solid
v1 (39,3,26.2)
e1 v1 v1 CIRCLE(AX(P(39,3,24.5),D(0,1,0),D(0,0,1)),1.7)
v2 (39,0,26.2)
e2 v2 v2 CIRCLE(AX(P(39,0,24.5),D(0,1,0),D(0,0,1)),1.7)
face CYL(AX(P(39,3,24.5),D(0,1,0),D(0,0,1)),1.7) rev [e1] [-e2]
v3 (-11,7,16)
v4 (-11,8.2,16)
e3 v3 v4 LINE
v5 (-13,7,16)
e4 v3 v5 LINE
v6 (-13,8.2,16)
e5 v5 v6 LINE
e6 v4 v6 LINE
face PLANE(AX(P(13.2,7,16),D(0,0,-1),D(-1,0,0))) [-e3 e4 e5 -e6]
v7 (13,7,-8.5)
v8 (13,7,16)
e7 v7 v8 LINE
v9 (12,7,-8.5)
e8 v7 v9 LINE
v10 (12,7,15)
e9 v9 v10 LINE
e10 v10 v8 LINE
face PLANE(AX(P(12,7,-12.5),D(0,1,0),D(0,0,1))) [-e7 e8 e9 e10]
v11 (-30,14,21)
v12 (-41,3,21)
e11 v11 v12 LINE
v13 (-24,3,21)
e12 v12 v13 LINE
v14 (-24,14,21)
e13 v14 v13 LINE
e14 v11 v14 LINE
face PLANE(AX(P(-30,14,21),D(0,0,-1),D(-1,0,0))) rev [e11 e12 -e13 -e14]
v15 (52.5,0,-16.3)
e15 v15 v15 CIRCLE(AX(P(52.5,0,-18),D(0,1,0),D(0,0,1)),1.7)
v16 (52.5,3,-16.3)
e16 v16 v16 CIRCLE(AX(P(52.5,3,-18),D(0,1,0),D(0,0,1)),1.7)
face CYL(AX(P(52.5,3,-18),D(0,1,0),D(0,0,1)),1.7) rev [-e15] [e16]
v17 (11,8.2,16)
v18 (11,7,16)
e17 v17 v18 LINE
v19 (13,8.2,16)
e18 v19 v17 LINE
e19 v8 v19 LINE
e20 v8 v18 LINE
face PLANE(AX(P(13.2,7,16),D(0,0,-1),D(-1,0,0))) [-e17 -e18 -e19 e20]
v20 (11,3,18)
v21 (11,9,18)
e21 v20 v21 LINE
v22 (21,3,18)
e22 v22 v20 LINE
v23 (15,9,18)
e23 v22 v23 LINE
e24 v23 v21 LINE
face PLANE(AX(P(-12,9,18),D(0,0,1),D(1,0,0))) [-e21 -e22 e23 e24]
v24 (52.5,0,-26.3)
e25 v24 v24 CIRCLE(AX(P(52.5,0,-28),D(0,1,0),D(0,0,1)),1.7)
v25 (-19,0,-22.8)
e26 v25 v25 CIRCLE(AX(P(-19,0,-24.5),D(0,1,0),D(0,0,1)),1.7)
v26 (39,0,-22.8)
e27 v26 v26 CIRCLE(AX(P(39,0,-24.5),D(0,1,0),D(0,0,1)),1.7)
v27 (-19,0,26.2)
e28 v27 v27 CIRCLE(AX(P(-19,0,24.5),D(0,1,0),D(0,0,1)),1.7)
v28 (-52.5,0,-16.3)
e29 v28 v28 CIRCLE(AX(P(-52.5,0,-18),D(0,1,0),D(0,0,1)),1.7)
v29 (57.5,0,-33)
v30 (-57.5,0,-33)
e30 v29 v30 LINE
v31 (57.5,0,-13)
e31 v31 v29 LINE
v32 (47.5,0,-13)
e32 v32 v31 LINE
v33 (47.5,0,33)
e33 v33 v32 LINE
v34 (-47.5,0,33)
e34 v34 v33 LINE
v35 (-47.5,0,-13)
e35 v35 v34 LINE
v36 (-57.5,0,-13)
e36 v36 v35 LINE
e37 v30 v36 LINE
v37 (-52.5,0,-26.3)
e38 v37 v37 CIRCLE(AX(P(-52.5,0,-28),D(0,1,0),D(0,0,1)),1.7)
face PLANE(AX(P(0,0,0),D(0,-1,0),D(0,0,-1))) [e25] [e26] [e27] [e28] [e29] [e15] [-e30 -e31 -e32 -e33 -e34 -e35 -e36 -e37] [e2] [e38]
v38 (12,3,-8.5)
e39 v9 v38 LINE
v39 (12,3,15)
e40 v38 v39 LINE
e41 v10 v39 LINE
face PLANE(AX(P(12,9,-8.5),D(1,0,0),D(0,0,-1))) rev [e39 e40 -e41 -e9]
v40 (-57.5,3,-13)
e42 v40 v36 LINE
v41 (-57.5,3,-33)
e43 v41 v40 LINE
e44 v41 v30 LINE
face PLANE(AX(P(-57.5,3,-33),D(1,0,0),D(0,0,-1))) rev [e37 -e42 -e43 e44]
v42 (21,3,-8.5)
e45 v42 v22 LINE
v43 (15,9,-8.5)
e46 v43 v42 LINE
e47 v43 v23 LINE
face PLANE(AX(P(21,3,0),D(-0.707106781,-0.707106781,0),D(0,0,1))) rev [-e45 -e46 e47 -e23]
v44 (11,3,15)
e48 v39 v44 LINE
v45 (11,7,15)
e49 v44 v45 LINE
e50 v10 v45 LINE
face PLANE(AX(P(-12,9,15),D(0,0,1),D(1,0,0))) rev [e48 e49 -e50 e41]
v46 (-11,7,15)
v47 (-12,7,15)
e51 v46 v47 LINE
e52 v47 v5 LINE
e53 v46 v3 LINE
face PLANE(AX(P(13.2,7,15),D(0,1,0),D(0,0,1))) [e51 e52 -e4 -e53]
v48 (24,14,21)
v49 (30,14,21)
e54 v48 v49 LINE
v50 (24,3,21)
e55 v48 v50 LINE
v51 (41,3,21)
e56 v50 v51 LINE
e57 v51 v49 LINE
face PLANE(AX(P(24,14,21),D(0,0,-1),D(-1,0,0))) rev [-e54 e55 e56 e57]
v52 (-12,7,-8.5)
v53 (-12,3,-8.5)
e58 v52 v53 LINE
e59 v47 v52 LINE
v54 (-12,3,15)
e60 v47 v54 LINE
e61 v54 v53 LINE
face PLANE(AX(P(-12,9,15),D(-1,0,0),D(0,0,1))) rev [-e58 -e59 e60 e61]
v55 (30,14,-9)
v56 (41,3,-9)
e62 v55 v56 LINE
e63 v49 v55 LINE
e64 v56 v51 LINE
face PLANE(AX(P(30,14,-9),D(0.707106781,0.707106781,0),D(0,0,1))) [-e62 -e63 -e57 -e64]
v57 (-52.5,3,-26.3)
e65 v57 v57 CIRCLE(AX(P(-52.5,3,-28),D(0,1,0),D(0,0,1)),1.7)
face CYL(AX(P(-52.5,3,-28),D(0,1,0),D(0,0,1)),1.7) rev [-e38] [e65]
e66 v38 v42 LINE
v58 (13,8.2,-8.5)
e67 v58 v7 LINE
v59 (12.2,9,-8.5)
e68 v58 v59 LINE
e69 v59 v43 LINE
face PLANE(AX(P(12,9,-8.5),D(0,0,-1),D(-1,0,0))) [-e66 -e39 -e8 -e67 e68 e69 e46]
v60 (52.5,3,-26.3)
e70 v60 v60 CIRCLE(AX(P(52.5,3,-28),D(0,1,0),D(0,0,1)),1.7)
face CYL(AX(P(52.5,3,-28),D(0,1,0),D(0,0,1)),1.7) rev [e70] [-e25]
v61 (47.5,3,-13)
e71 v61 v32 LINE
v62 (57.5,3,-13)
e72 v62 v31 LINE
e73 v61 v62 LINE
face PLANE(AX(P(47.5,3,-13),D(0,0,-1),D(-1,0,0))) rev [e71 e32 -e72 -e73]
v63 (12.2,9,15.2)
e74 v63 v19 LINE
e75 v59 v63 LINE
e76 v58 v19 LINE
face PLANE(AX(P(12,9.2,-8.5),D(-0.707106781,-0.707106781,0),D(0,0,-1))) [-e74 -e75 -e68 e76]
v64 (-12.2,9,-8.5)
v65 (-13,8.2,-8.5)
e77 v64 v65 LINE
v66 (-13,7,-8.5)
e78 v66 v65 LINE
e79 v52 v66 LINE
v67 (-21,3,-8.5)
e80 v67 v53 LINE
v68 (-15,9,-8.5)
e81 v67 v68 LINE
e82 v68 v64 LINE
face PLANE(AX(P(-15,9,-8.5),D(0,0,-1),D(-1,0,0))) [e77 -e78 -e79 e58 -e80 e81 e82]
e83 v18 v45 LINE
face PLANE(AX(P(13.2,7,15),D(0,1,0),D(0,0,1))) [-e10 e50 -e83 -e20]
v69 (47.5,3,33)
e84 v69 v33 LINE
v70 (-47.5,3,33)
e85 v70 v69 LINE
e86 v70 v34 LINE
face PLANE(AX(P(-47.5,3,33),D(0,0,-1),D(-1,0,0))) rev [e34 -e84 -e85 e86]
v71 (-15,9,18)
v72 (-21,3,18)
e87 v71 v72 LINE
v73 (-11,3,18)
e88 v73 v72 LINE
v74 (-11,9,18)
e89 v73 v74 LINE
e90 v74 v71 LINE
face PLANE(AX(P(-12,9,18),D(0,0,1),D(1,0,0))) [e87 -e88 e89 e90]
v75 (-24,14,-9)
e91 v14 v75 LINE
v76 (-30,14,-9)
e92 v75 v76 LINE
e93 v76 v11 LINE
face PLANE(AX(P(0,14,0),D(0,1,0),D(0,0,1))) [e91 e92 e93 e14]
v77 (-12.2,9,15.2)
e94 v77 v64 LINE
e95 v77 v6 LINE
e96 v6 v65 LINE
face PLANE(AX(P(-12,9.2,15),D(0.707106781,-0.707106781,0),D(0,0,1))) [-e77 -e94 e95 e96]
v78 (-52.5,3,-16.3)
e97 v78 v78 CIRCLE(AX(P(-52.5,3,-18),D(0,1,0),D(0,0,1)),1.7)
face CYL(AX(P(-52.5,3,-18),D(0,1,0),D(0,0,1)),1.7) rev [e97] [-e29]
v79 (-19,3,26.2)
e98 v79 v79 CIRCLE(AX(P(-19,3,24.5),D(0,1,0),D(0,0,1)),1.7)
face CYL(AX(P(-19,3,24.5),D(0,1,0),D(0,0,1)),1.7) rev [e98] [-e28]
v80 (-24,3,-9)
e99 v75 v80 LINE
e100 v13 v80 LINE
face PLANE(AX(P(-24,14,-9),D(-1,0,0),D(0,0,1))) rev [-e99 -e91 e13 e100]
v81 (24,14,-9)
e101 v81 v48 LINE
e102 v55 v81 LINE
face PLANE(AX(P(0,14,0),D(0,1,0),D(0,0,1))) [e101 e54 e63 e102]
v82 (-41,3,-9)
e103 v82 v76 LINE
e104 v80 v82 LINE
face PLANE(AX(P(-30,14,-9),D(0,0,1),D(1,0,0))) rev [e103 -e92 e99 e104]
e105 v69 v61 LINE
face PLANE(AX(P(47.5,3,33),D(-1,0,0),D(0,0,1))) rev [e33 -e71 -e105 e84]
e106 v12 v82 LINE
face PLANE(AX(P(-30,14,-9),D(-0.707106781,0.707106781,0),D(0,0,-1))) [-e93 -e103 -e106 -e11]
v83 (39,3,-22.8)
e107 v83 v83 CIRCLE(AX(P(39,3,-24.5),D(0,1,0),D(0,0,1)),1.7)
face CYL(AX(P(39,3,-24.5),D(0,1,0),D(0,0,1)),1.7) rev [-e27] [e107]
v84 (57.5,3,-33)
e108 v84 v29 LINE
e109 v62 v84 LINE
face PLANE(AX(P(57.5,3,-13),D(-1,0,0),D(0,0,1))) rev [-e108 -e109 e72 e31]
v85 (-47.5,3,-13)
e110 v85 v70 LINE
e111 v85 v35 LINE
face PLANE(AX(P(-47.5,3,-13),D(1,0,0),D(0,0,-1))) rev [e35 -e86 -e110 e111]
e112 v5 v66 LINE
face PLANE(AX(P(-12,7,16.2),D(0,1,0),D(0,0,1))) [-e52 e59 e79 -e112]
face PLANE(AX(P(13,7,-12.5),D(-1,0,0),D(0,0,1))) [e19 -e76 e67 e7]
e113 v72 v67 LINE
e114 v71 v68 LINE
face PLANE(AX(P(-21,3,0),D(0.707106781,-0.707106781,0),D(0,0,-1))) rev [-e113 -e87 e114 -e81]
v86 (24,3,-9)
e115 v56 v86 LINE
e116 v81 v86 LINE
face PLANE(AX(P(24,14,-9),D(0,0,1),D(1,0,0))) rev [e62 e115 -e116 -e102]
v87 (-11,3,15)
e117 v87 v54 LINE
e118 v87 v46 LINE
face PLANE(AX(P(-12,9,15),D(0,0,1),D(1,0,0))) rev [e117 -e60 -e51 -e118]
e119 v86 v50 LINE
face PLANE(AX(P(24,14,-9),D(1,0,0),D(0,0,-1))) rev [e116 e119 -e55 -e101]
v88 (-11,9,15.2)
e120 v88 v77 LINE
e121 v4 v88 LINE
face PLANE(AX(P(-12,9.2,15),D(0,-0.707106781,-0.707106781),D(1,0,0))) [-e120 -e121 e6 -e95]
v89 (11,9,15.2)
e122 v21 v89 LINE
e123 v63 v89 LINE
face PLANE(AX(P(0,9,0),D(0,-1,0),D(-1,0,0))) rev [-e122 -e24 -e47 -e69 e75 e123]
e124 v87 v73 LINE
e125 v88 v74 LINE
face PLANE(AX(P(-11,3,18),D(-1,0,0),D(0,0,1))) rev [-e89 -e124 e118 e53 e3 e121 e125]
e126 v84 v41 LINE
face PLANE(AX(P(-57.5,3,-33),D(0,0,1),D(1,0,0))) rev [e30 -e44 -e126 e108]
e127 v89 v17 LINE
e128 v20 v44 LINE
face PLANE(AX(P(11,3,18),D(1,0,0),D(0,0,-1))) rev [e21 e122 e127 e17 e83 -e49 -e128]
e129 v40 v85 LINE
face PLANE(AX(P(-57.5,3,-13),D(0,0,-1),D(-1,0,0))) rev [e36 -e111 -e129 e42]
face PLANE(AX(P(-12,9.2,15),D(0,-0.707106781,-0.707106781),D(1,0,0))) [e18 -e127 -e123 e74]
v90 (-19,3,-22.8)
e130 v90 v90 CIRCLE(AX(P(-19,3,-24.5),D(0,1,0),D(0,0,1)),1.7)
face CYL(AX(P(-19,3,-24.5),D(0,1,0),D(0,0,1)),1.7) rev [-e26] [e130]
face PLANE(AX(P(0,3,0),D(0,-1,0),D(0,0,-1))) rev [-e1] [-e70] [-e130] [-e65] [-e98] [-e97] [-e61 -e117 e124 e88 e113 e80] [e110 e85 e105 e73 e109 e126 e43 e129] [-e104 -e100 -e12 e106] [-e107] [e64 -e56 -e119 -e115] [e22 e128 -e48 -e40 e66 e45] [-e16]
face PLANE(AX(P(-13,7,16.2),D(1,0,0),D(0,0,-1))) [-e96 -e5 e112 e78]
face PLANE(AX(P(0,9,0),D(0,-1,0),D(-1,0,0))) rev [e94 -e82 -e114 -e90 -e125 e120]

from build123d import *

# Parameters (mm, degrees)
BOSS_EXTRUDE1_DEPTH  = 3
M3_CLEARANCE_HOLE1_D = 3.4
M3_CLEARANCE_HOLE2_D = 3.4
EXTRUDE_THIN1_DEPTH  = 6
SKETCH9_W            = 1
SKETCH9_H            = 1.2
CHAMFER1_SIZE        = 1
SKETCH11_W           = 22
SKETCH11_H           = 3
CUT_EXTRUDE1_DEPTH   = 6
SKETCH12_W           = 6
SKETCH12_H           = 30
BOSS_EXTRUDE3_DEPTH  = 11
CHAMFER2_SIZE        = 6
CHAMFER3_SIZE        = 11


# Some blends are built 0.0001 mm under size
with BuildPart() as part:
    # Sketch1 → Boss-Extrude1 (new body)
    with BuildSketch(Plane(origin=(0, 0, 0), x_dir=(1, 0, 0), z_dir=(0, 1, 0))):
        Polygon((-57.5, 33), (-57.5, 13), (-47.5, 13), (-47.5, -33), (47.5, -33), (47.5, 13), (57.5, 13), (57.5, 33), align=None)
    extrude(amount=BOSS_EXTRUDE1_DEPTH)

    # M3 Clearance Hole1 (through all)
    with Locations(Plane(origin=(0, 3, 0), x_dir=(1, 0, 0), z_dir=(0, 1, 0))):
        with Locations((-52.5, 28), (-52.5, 18), (52.5, 28), (52.5, 18)):
            Hole(M3_CLEARANCE_HOLE1_D / 2)

    # M3 Clearance Hole2 (through all)
    with Locations(Plane(origin=(0, 3, 0), x_dir=(1, 0, 0), z_dir=(0, 1, 0))):
        with Locations((-19, 24.5), (-19, -24.5), (39, -24.5), (39, 24.5)):
            Hole(M3_CLEARANCE_HOLE2_D / 2)

    # Sketch8 → Extrude-Thin1 (add)
    with BuildSketch(Plane(origin=(0, 3, 0), x_dir=(1, 0, 0), z_dir=(0, 1, 0))):
        Polygon((-12, 8.5), (-12, -15), (12, -15), (12, 8.5), (15, 8.5), (15, -18), (-15, -18), (-15, 8.5), align=None)
    extrude(amount=EXTRUDE_THIN1_DEPTH)

    # Cut-Sweep1: sweep along a path in Sketch10
    with BuildLine(Plane(origin=(0, 7.6, 0), x_dir=(1, 0, 0), z_dir=(0, 1, 0))) as cut_sweep1_path:
        Line((12, 8.5), (12, -15))
        Line((12, -15), (-12, -15))
        Line((-12, -15), (-12, 8.5))
    # Sketch9 → Cut-Sweep1 (sweep, cut)
    with BuildSketch(Plane(origin=(0, 0, -8.5), x_dir=(-1, 0, 0), z_dir=(0, 0, -1))):
        with Locations((-12.5, 7.6)):
            Rectangle(SKETCH9_W, SKETCH9_H)
    sweep(path=cut_sweep1_path.line, transition=Transition.RIGHT, mode=Mode.SUBTRACT)

    # Chamfer1
    # the kernel refuses this chamfer: 1 mm, written as the material it takes off along each edge
    with BuildSketch(Plane(origin=(-12, 8.2, 15), x_dir=(-0.9996219169112968, -0.0274958766105856, 0), z_dir=(0, 0, -1))) as chamfer1_piece_1_section:
        Polygon((CHAMFER1_SIZE * 0.999621916911, CHAMFER1_SIZE * 0.0274958766106), (-CHAMFER1_SIZE * 0.0274958766106, CHAMFER1_SIZE * 0.999621916911), (0, 0), align=None)
    chamfer1_piece_1 = extrude(amount=26.071682988, mode=Mode.PRIVATE)
    chamfer1_piece_1 = split(chamfer1_piece_1, bisect_by=Plane(origin=(-13, 8.530404154, 1.964158506), z_dir=(1, 0, 0)), keep=Keep.TOP, mode=Mode.PRIVATE)
    add(chamfer1_piece_1, mode=Mode.SUBTRACT)
    with BuildSketch(Plane(origin=(12, 8.2, 15), x_dir=(0, -0.0274958766105856, 0.9996219169112968), z_dir=(-1, 0, 0))) as chamfer1_piece_2_section:
        Polygon((CHAMFER1_SIZE * 0.999621916911, CHAMFER1_SIZE * 0.0274958766106), (-CHAMFER1_SIZE * 0.0274958766106, CHAMFER1_SIZE * 0.999621916911), (0, 0), align=None)
    chamfer1_piece_2 = extrude(amount=24, mode=Mode.PRIVATE)
    chamfer1_piece_2 = split(chamfer1_piece_2, bisect_by=Plane(origin=(0, 8.530404154, 16), z_dir=(0, 0, -1)), keep=Keep.TOP, mode=Mode.PRIVATE)
    add(chamfer1_piece_2, mode=Mode.SUBTRACT)
    with BuildSketch(Plane(origin=(12, 8.2, -11.071682988), x_dir=(0.9996219169112968, -0.027495876610585647, 0), z_dir=(0, 0, 1))) as chamfer1_piece_3_section:
        Polygon((CHAMFER1_SIZE * 0.999621916911, CHAMFER1_SIZE * 0.0274958766106), (-CHAMFER1_SIZE * 0.0274958766106, CHAMFER1_SIZE * 0.999621916911), (0, 0), align=None)
    chamfer1_piece_3 = extrude(amount=26.071682988, mode=Mode.PRIVATE)
    chamfer1_piece_3 = split(chamfer1_piece_3, bisect_by=Plane(origin=(13, 8.530404154, 1.964158506), z_dir=(-1, 0, 0)), keep=Keep.TOP, mode=Mode.PRIVATE)
    add(chamfer1_piece_3, mode=Mode.SUBTRACT)
    with BuildSketch(Plane(origin=(-12, 8.2, 17.571682988), x_dir=(-0.9996219169112968, -0.027495876610585647, 0), z_dir=(0, 0, -1))) as chamfer1_piece_4a_section:
        Polygon((CHAMFER1_SIZE * 0.999621916911, CHAMFER1_SIZE * 0.0274958766106), (-CHAMFER1_SIZE * 0.0274958766106, CHAMFER1_SIZE * 0.999621916911), (0, 0), align=None)
    chamfer1_piece_4a = extrude(amount=28.643365976, mode=Mode.PRIVATE)
    chamfer1_piece_4a = split(chamfer1_piece_4a, bisect_by=Plane(origin=(-13, 8.530404154, 15.5), z_dir=(1, 0, 0)), keep=Keep.TOP, mode=Mode.PRIVATE)
    chamfer1_piece_4a = split(chamfer1_piece_4a, bisect_by=Plane(origin=(-12.328634334, 8.530404154, 16), z_dir=(0, 0, -1)), keep=Keep.TOP, mode=Mode.PRIVATE)
    chamfer1_piece_4a = split(chamfer1_piece_4a, bisect_by=Plane(origin=(-12.328634334, 8.530404154, 15), z_dir=(0, 0, 1)), keep=Keep.TOP, mode=Mode.PRIVATE)
    with BuildSketch(Plane(origin=(12, 8.2, 15), x_dir=(0, -0.0274958766105856, 0.9996219169112968), z_dir=(-1, 0, 0))) as chamfer1_piece_4b_section:
        Polygon((CHAMFER1_SIZE * 0.999621916911, CHAMFER1_SIZE * 0.0274958766106), (-CHAMFER1_SIZE * 0.0274958766106, CHAMFER1_SIZE * 0.999621916911), (0, 0), align=None)
    chamfer1_piece_4b = extrude(amount=26.571682988, mode=Mode.PRIVATE)
    chamfer1_piece_4b = split(chamfer1_piece_4b, bisect_by=Plane(origin=(-13, 8.530404154, 15.328634334), z_dir=(1, 0, 0)), keep=Keep.TOP, mode=Mode.PRIVATE)
    chamfer1_piece_4b = split(chamfer1_piece_4b, bisect_by=Plane(origin=(-12.5, 8.530404154, 16), z_dir=(0, 0, -1)), keep=Keep.TOP, mode=Mode.PRIVATE)
    chamfer1_piece_4b = split(chamfer1_piece_4b, bisect_by=Plane(origin=(-12, 8.530404154, 15.328634334), z_dir=(-1, 0, 0)), keep=Keep.TOP, mode=Mode.PRIVATE)
    chamfer1_piece_4 = chamfer1_piece_4a & chamfer1_piece_4b
    add(chamfer1_piece_4, mode=Mode.SUBTRACT)
    with BuildSketch(Plane(origin=(12, 8.2, -11.071682988), x_dir=(0.9996219169112968, -0.027495876610585647, 0), z_dir=(0, 0, 1))) as chamfer1_piece_5a_section:
        Polygon((CHAMFER1_SIZE * 0.999621916911, CHAMFER1_SIZE * 0.0274958766106), (-CHAMFER1_SIZE * 0.0274958766106, CHAMFER1_SIZE * 0.999621916911), (0, 0), align=None)
    chamfer1_piece_5a = extrude(amount=28.643365976, mode=Mode.PRIVATE)
    chamfer1_piece_5a = split(chamfer1_piece_5a, bisect_by=Plane(origin=(13, 8.530404154, 15.5), z_dir=(-1, 0, 0)), keep=Keep.TOP, mode=Mode.PRIVATE)
    chamfer1_piece_5a = split(chamfer1_piece_5a, bisect_by=Plane(origin=(12.328634334, 8.530404154, 16), z_dir=(0, 0, -1)), keep=Keep.TOP, mode=Mode.PRIVATE)
    chamfer1_piece_5a = split(chamfer1_piece_5a, bisect_by=Plane(origin=(12.328634334, 8.530404154, 15), z_dir=(0, 0, 1)), keep=Keep.TOP, mode=Mode.PRIVATE)
    with BuildSketch(Plane(origin=(14.571682988, 8.2, 15), x_dir=(0, -0.0274958766105856, 0.9996219169112968), z_dir=(-1, 0, 0))) as chamfer1_piece_5b_section:
        Polygon((CHAMFER1_SIZE * 0.999621916911, CHAMFER1_SIZE * 0.0274958766106), (-CHAMFER1_SIZE * 0.0274958766106, CHAMFER1_SIZE * 0.999621916911), (0, 0), align=None)
    chamfer1_piece_5b = extrude(amount=26.571682988, mode=Mode.PRIVATE)
    chamfer1_piece_5b = split(chamfer1_piece_5b, bisect_by=Plane(origin=(13, 8.530404154, 15.328634334), z_dir=(-1, 0, 0)), keep=Keep.TOP, mode=Mode.PRIVATE)
    chamfer1_piece_5b = split(chamfer1_piece_5b, bisect_by=Plane(origin=(12.5, 8.530404154, 16), z_dir=(0, 0, -1)), keep=Keep.TOP, mode=Mode.PRIVATE)
    chamfer1_piece_5b = split(chamfer1_piece_5b, bisect_by=Plane(origin=(12, 8.530404154, 15.328634334), z_dir=(1, 0, 0)), keep=Keep.TOP, mode=Mode.PRIVATE)
    chamfer1_piece_5 = chamfer1_piece_5a & chamfer1_piece_5b
    add(chamfer1_piece_5, mode=Mode.SUBTRACT)

    # Sketch11 → Cut-Extrude1 (cut)
    with BuildSketch(Plane(origin=(0, 9, 0), x_dir=(1, 0, 0), z_dir=(0, 1, 0))):
        with Locations((0, -16.5)):
            Rectangle(SKETCH11_W, SKETCH11_H)
    extrude(amount=-CUT_EXTRUDE1_DEPTH, mode=Mode.SUBTRACT)

    # Sketch12 → Boss-Extrude3 (add)
    with BuildSketch(Plane(origin=(0, 3, 0), x_dir=(1, 0, 0), z_dir=(0, 1, 0))):
        with Locations((-27, -6)):
            Rectangle(SKETCH12_W, SKETCH12_H)
        with Locations((27, -6)):
            Rectangle(SKETCH12_W, SKETCH12_H)
    extrude(amount=BOSS_EXTRUDE3_DEPTH)

    # Chamfer2
    chamfer2_edges = [part.edges().sort_by_distance(p)[0] for p in [
        (15, 3, 4.75),
        (-15, 3, 4.75),
    ]]
    chamfer(chamfer2_edges, length=CHAMFER2_SIZE - 0.0001)  # a hair under: the kernel refuses the full size

    # Chamfer3
    chamfer3_edges = [part.edges().sort_by_distance(p)[0] for p in [
        (30, 3, 6),
        (-30, 3, 6),
    ]]
    chamfer(chamfer3_edges, length=CHAMFER3_SIZE - 0.0001)  # a hair under: the kernel refuses the full size


solid = part.part
